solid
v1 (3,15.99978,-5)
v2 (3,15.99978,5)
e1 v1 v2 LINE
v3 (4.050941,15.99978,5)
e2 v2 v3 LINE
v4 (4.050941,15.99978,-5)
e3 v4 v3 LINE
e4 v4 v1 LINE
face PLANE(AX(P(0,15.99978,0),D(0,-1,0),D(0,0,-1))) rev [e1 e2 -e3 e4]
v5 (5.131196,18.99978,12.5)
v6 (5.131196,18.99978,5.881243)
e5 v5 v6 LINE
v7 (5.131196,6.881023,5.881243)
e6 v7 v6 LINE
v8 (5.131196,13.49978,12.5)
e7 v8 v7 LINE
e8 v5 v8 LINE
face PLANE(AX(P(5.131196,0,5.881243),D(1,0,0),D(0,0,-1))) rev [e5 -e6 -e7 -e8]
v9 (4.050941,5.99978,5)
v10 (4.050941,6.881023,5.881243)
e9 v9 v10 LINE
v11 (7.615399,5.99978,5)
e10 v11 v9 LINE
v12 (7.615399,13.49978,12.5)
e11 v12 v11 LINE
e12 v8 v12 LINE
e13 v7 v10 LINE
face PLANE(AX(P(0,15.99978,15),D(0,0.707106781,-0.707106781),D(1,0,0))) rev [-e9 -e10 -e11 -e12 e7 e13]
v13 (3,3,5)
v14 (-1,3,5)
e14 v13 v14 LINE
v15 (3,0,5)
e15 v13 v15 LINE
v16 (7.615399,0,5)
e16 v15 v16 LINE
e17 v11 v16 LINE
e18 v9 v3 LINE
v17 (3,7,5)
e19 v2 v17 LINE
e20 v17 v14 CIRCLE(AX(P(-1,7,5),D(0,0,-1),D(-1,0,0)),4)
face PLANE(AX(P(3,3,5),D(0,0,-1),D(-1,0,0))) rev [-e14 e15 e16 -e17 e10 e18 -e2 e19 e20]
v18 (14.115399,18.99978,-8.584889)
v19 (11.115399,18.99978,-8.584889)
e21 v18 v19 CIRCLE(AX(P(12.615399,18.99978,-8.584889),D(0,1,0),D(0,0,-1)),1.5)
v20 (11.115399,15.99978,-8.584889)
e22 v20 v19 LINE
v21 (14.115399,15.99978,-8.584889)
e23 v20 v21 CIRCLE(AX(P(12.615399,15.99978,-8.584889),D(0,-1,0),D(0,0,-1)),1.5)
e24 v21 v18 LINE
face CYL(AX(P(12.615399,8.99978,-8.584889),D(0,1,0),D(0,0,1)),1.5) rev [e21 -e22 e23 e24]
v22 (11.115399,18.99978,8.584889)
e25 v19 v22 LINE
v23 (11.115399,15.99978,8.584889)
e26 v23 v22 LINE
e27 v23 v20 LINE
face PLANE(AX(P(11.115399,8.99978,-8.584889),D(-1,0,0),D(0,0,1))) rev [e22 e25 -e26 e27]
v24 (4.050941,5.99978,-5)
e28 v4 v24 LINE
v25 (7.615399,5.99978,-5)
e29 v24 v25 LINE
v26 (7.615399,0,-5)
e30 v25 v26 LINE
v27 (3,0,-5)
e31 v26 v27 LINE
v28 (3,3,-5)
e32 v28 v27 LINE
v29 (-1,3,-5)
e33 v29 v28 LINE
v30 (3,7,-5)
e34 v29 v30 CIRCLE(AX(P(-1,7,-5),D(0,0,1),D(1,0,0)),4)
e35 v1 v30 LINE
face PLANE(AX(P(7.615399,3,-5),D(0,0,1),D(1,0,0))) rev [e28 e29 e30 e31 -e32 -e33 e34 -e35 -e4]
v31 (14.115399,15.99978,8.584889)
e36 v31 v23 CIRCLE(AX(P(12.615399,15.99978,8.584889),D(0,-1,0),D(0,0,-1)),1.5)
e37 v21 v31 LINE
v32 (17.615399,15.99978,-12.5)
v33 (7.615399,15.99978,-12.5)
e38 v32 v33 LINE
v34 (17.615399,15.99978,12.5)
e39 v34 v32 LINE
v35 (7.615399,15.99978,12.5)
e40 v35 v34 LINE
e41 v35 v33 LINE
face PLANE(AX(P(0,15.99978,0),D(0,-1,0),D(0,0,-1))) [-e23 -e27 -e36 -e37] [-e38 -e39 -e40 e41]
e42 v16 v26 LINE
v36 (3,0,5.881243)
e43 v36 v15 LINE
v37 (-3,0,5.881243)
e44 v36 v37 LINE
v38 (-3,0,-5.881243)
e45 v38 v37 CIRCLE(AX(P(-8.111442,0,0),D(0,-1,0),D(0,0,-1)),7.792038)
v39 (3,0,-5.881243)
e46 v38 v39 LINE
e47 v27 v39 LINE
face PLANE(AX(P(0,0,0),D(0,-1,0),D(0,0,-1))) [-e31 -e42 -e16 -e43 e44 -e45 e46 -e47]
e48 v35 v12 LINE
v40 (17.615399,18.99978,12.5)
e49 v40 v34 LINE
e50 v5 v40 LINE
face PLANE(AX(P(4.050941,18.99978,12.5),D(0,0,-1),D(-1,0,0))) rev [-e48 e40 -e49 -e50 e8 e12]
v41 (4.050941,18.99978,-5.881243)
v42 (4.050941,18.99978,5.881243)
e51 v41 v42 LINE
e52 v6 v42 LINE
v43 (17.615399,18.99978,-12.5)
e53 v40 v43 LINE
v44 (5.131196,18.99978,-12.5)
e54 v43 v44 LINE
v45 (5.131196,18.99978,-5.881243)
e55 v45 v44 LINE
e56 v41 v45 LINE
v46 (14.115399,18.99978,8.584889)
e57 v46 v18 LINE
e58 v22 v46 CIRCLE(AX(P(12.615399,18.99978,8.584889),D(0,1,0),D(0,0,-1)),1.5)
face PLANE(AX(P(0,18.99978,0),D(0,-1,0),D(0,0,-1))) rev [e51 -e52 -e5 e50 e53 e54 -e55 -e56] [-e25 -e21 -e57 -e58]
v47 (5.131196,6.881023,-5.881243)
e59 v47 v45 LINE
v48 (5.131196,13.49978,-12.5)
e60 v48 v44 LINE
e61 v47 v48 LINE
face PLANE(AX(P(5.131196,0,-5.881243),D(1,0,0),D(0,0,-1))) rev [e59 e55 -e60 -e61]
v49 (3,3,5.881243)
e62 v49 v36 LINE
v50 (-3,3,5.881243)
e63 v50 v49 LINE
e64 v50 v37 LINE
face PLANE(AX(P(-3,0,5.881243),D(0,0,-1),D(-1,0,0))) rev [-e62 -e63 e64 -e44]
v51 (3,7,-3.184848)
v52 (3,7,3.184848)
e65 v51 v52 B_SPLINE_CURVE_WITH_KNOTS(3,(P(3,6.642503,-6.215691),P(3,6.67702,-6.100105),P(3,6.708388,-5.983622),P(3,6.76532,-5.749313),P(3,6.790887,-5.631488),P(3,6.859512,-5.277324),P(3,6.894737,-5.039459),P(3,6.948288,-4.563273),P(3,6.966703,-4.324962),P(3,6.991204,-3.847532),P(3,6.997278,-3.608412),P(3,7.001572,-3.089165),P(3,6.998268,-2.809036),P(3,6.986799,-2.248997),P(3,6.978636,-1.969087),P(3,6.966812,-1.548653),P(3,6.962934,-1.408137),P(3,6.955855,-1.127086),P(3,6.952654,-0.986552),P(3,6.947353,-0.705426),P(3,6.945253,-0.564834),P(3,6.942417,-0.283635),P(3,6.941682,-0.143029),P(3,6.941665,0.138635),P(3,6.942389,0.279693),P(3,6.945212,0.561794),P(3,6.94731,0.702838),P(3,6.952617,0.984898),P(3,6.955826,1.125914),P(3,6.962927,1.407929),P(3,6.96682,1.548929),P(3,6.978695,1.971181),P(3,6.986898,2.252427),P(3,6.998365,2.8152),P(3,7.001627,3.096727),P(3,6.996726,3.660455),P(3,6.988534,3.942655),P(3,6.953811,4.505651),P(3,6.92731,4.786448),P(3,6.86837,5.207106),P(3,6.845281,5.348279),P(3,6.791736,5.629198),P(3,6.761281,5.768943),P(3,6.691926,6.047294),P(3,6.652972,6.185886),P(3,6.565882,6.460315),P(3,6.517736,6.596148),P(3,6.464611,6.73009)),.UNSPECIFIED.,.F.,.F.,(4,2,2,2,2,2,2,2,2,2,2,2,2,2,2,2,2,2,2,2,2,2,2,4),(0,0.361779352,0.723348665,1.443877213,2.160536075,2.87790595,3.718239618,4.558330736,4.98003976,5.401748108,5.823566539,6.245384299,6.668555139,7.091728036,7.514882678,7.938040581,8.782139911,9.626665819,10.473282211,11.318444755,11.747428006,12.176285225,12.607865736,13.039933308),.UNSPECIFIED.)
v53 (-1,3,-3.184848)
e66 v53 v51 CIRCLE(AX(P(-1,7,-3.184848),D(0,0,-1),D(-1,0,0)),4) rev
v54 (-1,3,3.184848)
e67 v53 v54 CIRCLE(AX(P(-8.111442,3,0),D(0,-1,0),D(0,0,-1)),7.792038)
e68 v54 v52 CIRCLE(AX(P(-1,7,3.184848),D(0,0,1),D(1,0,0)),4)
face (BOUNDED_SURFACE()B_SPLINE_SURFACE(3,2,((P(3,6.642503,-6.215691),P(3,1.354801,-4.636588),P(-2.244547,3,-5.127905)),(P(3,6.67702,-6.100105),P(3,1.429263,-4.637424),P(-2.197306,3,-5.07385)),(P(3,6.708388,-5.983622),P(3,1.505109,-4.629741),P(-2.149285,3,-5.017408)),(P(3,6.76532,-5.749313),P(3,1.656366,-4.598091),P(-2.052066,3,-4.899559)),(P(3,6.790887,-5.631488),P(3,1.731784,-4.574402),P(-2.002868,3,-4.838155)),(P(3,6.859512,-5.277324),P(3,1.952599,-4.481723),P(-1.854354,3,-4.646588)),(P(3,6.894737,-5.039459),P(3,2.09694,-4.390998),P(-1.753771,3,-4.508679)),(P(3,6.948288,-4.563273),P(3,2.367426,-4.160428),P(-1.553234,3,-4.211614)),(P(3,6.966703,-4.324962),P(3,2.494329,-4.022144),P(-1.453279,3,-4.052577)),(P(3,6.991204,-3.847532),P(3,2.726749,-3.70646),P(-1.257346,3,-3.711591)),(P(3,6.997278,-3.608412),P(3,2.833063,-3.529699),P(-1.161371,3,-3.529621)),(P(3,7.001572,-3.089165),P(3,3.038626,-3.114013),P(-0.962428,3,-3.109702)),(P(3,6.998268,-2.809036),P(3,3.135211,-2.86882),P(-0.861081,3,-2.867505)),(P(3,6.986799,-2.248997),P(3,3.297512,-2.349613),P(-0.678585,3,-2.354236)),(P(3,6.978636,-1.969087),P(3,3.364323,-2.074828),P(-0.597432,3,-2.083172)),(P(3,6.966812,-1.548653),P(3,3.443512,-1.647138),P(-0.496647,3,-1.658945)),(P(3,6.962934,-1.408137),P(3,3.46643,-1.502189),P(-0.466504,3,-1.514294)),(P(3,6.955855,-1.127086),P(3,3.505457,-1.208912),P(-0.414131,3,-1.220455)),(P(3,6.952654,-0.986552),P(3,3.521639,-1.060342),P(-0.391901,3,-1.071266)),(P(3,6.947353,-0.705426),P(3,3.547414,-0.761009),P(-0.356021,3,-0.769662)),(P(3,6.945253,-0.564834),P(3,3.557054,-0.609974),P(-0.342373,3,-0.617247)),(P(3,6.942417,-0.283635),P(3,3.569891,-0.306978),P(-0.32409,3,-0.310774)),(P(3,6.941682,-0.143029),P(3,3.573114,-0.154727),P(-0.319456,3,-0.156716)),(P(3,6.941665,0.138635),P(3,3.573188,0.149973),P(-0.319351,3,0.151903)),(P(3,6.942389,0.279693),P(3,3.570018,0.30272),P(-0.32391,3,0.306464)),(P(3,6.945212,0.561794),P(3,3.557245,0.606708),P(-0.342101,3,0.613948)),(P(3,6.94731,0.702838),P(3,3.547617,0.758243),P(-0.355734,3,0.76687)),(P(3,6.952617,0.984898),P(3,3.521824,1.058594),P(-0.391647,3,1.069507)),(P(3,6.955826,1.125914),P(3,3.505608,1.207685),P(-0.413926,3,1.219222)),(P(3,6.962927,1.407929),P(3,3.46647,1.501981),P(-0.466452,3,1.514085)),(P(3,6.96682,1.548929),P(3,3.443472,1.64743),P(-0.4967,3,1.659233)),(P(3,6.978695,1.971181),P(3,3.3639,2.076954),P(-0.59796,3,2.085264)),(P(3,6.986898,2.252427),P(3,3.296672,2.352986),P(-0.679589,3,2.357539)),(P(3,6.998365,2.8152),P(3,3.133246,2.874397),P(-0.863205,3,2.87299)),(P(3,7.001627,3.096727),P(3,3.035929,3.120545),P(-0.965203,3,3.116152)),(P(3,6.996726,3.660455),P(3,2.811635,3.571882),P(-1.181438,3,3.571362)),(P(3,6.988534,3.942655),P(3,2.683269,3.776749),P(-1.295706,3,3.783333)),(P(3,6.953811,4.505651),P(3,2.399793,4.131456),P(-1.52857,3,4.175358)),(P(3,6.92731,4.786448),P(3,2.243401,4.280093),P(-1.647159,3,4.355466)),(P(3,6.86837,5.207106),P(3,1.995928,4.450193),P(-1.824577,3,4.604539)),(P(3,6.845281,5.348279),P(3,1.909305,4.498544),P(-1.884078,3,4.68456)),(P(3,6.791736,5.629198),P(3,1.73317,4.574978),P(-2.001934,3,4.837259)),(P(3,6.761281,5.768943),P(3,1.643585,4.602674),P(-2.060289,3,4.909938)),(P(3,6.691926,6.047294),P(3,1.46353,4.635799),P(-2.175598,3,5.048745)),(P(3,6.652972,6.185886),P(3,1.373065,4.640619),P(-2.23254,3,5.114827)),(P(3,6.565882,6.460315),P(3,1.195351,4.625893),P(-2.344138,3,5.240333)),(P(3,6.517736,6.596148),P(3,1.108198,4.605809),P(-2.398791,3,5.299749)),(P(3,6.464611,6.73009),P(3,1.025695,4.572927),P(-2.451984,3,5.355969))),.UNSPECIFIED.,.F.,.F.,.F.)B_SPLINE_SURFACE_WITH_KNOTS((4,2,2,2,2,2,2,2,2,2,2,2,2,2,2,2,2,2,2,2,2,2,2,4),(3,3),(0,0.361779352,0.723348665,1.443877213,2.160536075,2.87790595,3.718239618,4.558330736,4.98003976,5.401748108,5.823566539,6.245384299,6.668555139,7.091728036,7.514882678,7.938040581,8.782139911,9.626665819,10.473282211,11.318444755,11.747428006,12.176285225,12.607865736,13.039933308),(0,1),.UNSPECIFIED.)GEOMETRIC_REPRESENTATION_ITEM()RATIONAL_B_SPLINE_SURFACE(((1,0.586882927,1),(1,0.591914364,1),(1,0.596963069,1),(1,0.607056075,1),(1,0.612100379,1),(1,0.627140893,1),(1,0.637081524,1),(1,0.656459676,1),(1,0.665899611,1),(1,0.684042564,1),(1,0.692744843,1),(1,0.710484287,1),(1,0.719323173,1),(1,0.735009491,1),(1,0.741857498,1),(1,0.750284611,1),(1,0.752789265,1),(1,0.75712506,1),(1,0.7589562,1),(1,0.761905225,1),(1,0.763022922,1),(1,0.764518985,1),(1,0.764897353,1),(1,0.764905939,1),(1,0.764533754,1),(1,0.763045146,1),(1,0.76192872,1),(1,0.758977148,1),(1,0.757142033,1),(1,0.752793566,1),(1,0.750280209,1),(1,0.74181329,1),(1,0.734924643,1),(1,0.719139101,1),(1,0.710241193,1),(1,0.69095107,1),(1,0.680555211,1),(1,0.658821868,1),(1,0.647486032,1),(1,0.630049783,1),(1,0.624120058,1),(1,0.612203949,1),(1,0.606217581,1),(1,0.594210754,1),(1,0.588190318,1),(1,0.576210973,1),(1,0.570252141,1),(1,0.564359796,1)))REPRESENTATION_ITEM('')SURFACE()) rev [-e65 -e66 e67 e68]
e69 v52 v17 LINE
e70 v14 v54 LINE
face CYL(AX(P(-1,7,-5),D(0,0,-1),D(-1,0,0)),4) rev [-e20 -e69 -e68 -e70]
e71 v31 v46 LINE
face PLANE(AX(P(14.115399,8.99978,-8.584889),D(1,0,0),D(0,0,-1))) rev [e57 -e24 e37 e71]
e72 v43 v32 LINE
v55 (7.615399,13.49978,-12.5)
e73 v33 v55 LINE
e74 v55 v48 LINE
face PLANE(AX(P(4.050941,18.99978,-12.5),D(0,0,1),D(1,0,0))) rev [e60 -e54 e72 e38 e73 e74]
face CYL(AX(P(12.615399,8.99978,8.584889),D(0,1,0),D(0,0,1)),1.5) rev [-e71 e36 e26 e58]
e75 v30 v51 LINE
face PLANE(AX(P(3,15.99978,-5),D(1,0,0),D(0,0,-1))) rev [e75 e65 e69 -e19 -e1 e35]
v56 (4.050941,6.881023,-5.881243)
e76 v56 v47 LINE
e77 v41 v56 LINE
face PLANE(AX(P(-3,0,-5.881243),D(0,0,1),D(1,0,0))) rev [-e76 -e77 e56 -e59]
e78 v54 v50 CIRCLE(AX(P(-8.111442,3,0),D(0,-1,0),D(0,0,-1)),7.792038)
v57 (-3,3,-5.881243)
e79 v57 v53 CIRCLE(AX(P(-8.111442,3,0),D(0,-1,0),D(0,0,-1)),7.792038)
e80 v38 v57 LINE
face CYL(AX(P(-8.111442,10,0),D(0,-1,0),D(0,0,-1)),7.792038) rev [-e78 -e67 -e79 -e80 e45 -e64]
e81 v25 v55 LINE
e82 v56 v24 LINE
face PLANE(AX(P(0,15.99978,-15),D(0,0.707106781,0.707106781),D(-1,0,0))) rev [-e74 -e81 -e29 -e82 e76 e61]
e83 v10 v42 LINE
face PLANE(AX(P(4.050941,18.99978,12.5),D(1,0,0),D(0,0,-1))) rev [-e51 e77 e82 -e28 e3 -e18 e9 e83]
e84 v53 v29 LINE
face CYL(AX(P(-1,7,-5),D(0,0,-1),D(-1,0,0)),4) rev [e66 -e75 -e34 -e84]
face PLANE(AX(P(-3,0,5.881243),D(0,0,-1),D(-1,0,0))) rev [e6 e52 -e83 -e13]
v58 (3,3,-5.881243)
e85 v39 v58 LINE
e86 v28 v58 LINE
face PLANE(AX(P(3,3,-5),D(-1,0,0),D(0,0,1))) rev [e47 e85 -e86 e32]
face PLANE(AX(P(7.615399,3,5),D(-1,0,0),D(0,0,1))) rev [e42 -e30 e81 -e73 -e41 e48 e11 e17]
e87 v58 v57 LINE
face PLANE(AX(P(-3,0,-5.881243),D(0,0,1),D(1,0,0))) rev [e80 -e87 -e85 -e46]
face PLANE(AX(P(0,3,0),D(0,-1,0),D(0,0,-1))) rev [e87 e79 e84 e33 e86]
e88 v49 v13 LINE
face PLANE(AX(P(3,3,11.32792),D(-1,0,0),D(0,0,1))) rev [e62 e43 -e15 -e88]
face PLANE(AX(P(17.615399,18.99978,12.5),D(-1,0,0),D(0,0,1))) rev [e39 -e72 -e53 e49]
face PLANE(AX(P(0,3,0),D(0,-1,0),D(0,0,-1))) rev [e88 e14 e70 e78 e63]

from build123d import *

# Parameters (mm, degrees)
SKETCH1_R               = 1.5
BOSS_EXTRUDE1_DEPTH     = 3
SKETCH3_W               = 4.615398666
SKETCH3_H               = 10
BOSS_EXTRUDE2_DEPTH     = 12.9997796
FILLET7_R               = 1
CUT_EXTRUDE4_DEPTH      = 10
SKETCH9_W               = 13.564457496
SKETCH9_H               = 25
SKETCH9_R               = 1.5
BOSS_EXTRUDE3_DEPTH     = 3
CHAMFER1_SIZE           = 10
CHAMFER2_SIZE           = 10
FILLET8_R               = 4
CUT_EXTRUDE5_DEPTH      = 27.880201216
CUT_EXTRUDE5_DEPTH_BACK = 27.880201216
SKETCH10_W              = 8.131195533
SKETCH10_H              = 6.749631571
SKETCH10_H_2            = 7.013496214
CUT_EXTRUDE6_DEPTH      = 10


with BuildPart() as part:
    # Sketch1 → Boss-Extrude1 (new body)
    with BuildSketch(Plane(origin=(0, 0, 0), x_dir=(1, 0, 0), z_dir=(0, 1, 0))):
        Polygon((-3, -11.32792047), (3, -11.32792047), (3, -5), (7.615398666, -5), (7.615398666, 5), (3, 5), (3, 11.32792047), (-3, 11.32792047), align=None)
        with Locations(Location((0, 8.5, 0), (0, 0, 270))):
            Circle(SKETCH1_R, mode=Mode.SUBTRACT)
        with Locations(Location((0, -8.5, 0), (0, 0, 270))):
            Circle(SKETCH1_R, mode=Mode.SUBTRACT)
    extrude(amount=BOSS_EXTRUDE1_DEPTH)

    # Sketch3 → Boss-Extrude2 (add)
    with BuildSketch(Plane(origin=(0, 3, 0), x_dir=(1, 0, 0), z_dir=(0, 1, 0))):
        with Locations((5.307699333, 0)):
            Rectangle(SKETCH3_W, SKETCH3_H)
    extrude(amount=BOSS_EXTRUDE2_DEPTH)

    # Fillet7
    fillet7_edges = [part.edges().sort_by_distance(p)[0] for p in [
        (3, 1.5, 11.32792047),
        (3, 1.5, -11.32792047),
    ]]
    fillet(fillet7_edges, radius=FILLET7_R)

    # Sketch7 → Cut-Extrude4 (cut)
    with BuildSketch(Plane.XZ):
        with BuildLine():
            Line((-3.65526474, -6.392053518), (-3.78188192, 6.478485425))
            ThreePointArc((-3.78188192, 6.478485425), (-0.319780446, 0.076652438), (-3.65526474, -6.392053518))
        make_face()
    extrude(amount=-CUT_EXTRUDE4_DEPTH, mode=Mode.SUBTRACT)

    # Sketch9 → Boss-Extrude3 (add)
    with BuildSketch(Plane(origin=(0, 15.9997796, 0), x_dir=(1, 0, 0), z_dir=(0, 1, 0))):
        with Locations((10.833169918, 0)):
            Rectangle(SKETCH9_W, SKETCH9_H)
        with Locations(Location((12.615398666, 6, 0), (0, 0, 270))):
            Circle(SKETCH9_R, mode=Mode.SUBTRACT)
        with Locations(Location((12.615398666, -6, 0), (0, 0, 270))):
            Circle(SKETCH9_R, mode=Mode.SUBTRACT)
    extrude(amount=BOSS_EXTRUDE3_DEPTH)

    # Chamfer1
    # the kernel refuses this chamfer: 10 mm, written as the material it adds along each edge
    with BuildSketch(Plane(origin=(4.05094117, 15.9997796, 5), x_dir=(0, -0.9996219169112968, -0.027495876610586403), z_dir=(1, 0, 0))) as chamfer1_piece_1_section:
        Polygon((CHAMFER1_SIZE * 0.999621916911, -CHAMFER1_SIZE * 0.0274958766106), (-CHAMFER1_SIZE * 0.0274958766106, -CHAMFER1_SIZE * 0.999621916911), (0, 0), align=None)
    chamfer1_piece_1 = extrude(amount=3.564457497, mode=Mode.PRIVATE)
    chamfer1_piece_1 = split(chamfer1_piece_1, bisect_by=Plane(origin=(5.833169918, 12.4997796, 12.5), z_dir=(0, 0, -1)), keep=Keep.TOP, mode=Mode.PRIVATE)
    add(chamfer1_piece_1)

    # Chamfer2
    # the kernel refuses this chamfer: 10 mm, written as the material it adds along each edge
    with BuildSketch(Plane(origin=(7.615398666, 15.9997796, -5), x_dir=(0, -0.9996219169112968, 0.027495876610586403), z_dir=(-1, 0, 0))) as chamfer2_piece_1_section:
        Polygon((CHAMFER2_SIZE * 0.999621916911, -CHAMFER2_SIZE * 0.0274958766106), (-CHAMFER2_SIZE * 0.0274958766106, -CHAMFER2_SIZE * 0.999621916911), (0, 0), align=None)
    chamfer2_piece_1 = extrude(amount=3.564457497, mode=Mode.PRIVATE)
    chamfer2_piece_1 = split(chamfer2_piece_1, bisect_by=Plane(origin=(5.833169918, 12.4997796, -12.5), z_dir=(0, 0, 1)), keep=Keep.TOP, mode=Mode.PRIVATE)
    add(chamfer2_piece_1)

    # Fillet8
    fillet8_edges = [part.edges().sort_by_distance(p)[0] for p in [
        (3, 3, 0),
    ]]
    fillet(fillet8_edges, radius=FILLET8_R)

    # Sketch10 → Cut-Extrude5 (cut, two sides: drawn at the far end of the back side and taken through both)
    with BuildSketch(Plane(origin=(0, 3, 0), x_dir=(1, 0, 0), z_dir=(0, 1, 0)).offset(-CUT_EXTRUDE5_DEPTH_BACK)):
        with Locations((1.065597767, 9.256059268)):
            Rectangle(SKETCH10_W, SKETCH10_H)
        with Locations((1.065597767, -9.38799159)):
            Rectangle(SKETCH10_W, SKETCH10_H_2)
    extrude(amount=CUT_EXTRUDE5_DEPTH + CUT_EXTRUDE5_DEPTH_BACK, mode=Mode.SUBTRACT)

    # Sketch11 → Cut-Extrude6 (cut)
    with BuildSketch(Plane(origin=(0, 18.9997796, 0), x_dir=(1, 0, 0), z_dir=(0, 1, 0))):
        with BuildLine():
            Line((14.115398666, 8.584889461), (14.115398666, -8.584889461))
            ThreePointArc((14.115398666, -8.584889461), (12.615398666, -10.084889461), (11.115398666, -8.584889461))
            Line((11.115398666, -8.584889461), (11.115398666, 8.584889461))
            ThreePointArc((11.115398666, 8.584889461), (12.615398666, 10.084889461), (14.115398666, 8.584889461))
        make_face()
    extrude(amount=-CUT_EXTRUDE6_DEPTH, mode=Mode.SUBTRACT)


solid = part.part
